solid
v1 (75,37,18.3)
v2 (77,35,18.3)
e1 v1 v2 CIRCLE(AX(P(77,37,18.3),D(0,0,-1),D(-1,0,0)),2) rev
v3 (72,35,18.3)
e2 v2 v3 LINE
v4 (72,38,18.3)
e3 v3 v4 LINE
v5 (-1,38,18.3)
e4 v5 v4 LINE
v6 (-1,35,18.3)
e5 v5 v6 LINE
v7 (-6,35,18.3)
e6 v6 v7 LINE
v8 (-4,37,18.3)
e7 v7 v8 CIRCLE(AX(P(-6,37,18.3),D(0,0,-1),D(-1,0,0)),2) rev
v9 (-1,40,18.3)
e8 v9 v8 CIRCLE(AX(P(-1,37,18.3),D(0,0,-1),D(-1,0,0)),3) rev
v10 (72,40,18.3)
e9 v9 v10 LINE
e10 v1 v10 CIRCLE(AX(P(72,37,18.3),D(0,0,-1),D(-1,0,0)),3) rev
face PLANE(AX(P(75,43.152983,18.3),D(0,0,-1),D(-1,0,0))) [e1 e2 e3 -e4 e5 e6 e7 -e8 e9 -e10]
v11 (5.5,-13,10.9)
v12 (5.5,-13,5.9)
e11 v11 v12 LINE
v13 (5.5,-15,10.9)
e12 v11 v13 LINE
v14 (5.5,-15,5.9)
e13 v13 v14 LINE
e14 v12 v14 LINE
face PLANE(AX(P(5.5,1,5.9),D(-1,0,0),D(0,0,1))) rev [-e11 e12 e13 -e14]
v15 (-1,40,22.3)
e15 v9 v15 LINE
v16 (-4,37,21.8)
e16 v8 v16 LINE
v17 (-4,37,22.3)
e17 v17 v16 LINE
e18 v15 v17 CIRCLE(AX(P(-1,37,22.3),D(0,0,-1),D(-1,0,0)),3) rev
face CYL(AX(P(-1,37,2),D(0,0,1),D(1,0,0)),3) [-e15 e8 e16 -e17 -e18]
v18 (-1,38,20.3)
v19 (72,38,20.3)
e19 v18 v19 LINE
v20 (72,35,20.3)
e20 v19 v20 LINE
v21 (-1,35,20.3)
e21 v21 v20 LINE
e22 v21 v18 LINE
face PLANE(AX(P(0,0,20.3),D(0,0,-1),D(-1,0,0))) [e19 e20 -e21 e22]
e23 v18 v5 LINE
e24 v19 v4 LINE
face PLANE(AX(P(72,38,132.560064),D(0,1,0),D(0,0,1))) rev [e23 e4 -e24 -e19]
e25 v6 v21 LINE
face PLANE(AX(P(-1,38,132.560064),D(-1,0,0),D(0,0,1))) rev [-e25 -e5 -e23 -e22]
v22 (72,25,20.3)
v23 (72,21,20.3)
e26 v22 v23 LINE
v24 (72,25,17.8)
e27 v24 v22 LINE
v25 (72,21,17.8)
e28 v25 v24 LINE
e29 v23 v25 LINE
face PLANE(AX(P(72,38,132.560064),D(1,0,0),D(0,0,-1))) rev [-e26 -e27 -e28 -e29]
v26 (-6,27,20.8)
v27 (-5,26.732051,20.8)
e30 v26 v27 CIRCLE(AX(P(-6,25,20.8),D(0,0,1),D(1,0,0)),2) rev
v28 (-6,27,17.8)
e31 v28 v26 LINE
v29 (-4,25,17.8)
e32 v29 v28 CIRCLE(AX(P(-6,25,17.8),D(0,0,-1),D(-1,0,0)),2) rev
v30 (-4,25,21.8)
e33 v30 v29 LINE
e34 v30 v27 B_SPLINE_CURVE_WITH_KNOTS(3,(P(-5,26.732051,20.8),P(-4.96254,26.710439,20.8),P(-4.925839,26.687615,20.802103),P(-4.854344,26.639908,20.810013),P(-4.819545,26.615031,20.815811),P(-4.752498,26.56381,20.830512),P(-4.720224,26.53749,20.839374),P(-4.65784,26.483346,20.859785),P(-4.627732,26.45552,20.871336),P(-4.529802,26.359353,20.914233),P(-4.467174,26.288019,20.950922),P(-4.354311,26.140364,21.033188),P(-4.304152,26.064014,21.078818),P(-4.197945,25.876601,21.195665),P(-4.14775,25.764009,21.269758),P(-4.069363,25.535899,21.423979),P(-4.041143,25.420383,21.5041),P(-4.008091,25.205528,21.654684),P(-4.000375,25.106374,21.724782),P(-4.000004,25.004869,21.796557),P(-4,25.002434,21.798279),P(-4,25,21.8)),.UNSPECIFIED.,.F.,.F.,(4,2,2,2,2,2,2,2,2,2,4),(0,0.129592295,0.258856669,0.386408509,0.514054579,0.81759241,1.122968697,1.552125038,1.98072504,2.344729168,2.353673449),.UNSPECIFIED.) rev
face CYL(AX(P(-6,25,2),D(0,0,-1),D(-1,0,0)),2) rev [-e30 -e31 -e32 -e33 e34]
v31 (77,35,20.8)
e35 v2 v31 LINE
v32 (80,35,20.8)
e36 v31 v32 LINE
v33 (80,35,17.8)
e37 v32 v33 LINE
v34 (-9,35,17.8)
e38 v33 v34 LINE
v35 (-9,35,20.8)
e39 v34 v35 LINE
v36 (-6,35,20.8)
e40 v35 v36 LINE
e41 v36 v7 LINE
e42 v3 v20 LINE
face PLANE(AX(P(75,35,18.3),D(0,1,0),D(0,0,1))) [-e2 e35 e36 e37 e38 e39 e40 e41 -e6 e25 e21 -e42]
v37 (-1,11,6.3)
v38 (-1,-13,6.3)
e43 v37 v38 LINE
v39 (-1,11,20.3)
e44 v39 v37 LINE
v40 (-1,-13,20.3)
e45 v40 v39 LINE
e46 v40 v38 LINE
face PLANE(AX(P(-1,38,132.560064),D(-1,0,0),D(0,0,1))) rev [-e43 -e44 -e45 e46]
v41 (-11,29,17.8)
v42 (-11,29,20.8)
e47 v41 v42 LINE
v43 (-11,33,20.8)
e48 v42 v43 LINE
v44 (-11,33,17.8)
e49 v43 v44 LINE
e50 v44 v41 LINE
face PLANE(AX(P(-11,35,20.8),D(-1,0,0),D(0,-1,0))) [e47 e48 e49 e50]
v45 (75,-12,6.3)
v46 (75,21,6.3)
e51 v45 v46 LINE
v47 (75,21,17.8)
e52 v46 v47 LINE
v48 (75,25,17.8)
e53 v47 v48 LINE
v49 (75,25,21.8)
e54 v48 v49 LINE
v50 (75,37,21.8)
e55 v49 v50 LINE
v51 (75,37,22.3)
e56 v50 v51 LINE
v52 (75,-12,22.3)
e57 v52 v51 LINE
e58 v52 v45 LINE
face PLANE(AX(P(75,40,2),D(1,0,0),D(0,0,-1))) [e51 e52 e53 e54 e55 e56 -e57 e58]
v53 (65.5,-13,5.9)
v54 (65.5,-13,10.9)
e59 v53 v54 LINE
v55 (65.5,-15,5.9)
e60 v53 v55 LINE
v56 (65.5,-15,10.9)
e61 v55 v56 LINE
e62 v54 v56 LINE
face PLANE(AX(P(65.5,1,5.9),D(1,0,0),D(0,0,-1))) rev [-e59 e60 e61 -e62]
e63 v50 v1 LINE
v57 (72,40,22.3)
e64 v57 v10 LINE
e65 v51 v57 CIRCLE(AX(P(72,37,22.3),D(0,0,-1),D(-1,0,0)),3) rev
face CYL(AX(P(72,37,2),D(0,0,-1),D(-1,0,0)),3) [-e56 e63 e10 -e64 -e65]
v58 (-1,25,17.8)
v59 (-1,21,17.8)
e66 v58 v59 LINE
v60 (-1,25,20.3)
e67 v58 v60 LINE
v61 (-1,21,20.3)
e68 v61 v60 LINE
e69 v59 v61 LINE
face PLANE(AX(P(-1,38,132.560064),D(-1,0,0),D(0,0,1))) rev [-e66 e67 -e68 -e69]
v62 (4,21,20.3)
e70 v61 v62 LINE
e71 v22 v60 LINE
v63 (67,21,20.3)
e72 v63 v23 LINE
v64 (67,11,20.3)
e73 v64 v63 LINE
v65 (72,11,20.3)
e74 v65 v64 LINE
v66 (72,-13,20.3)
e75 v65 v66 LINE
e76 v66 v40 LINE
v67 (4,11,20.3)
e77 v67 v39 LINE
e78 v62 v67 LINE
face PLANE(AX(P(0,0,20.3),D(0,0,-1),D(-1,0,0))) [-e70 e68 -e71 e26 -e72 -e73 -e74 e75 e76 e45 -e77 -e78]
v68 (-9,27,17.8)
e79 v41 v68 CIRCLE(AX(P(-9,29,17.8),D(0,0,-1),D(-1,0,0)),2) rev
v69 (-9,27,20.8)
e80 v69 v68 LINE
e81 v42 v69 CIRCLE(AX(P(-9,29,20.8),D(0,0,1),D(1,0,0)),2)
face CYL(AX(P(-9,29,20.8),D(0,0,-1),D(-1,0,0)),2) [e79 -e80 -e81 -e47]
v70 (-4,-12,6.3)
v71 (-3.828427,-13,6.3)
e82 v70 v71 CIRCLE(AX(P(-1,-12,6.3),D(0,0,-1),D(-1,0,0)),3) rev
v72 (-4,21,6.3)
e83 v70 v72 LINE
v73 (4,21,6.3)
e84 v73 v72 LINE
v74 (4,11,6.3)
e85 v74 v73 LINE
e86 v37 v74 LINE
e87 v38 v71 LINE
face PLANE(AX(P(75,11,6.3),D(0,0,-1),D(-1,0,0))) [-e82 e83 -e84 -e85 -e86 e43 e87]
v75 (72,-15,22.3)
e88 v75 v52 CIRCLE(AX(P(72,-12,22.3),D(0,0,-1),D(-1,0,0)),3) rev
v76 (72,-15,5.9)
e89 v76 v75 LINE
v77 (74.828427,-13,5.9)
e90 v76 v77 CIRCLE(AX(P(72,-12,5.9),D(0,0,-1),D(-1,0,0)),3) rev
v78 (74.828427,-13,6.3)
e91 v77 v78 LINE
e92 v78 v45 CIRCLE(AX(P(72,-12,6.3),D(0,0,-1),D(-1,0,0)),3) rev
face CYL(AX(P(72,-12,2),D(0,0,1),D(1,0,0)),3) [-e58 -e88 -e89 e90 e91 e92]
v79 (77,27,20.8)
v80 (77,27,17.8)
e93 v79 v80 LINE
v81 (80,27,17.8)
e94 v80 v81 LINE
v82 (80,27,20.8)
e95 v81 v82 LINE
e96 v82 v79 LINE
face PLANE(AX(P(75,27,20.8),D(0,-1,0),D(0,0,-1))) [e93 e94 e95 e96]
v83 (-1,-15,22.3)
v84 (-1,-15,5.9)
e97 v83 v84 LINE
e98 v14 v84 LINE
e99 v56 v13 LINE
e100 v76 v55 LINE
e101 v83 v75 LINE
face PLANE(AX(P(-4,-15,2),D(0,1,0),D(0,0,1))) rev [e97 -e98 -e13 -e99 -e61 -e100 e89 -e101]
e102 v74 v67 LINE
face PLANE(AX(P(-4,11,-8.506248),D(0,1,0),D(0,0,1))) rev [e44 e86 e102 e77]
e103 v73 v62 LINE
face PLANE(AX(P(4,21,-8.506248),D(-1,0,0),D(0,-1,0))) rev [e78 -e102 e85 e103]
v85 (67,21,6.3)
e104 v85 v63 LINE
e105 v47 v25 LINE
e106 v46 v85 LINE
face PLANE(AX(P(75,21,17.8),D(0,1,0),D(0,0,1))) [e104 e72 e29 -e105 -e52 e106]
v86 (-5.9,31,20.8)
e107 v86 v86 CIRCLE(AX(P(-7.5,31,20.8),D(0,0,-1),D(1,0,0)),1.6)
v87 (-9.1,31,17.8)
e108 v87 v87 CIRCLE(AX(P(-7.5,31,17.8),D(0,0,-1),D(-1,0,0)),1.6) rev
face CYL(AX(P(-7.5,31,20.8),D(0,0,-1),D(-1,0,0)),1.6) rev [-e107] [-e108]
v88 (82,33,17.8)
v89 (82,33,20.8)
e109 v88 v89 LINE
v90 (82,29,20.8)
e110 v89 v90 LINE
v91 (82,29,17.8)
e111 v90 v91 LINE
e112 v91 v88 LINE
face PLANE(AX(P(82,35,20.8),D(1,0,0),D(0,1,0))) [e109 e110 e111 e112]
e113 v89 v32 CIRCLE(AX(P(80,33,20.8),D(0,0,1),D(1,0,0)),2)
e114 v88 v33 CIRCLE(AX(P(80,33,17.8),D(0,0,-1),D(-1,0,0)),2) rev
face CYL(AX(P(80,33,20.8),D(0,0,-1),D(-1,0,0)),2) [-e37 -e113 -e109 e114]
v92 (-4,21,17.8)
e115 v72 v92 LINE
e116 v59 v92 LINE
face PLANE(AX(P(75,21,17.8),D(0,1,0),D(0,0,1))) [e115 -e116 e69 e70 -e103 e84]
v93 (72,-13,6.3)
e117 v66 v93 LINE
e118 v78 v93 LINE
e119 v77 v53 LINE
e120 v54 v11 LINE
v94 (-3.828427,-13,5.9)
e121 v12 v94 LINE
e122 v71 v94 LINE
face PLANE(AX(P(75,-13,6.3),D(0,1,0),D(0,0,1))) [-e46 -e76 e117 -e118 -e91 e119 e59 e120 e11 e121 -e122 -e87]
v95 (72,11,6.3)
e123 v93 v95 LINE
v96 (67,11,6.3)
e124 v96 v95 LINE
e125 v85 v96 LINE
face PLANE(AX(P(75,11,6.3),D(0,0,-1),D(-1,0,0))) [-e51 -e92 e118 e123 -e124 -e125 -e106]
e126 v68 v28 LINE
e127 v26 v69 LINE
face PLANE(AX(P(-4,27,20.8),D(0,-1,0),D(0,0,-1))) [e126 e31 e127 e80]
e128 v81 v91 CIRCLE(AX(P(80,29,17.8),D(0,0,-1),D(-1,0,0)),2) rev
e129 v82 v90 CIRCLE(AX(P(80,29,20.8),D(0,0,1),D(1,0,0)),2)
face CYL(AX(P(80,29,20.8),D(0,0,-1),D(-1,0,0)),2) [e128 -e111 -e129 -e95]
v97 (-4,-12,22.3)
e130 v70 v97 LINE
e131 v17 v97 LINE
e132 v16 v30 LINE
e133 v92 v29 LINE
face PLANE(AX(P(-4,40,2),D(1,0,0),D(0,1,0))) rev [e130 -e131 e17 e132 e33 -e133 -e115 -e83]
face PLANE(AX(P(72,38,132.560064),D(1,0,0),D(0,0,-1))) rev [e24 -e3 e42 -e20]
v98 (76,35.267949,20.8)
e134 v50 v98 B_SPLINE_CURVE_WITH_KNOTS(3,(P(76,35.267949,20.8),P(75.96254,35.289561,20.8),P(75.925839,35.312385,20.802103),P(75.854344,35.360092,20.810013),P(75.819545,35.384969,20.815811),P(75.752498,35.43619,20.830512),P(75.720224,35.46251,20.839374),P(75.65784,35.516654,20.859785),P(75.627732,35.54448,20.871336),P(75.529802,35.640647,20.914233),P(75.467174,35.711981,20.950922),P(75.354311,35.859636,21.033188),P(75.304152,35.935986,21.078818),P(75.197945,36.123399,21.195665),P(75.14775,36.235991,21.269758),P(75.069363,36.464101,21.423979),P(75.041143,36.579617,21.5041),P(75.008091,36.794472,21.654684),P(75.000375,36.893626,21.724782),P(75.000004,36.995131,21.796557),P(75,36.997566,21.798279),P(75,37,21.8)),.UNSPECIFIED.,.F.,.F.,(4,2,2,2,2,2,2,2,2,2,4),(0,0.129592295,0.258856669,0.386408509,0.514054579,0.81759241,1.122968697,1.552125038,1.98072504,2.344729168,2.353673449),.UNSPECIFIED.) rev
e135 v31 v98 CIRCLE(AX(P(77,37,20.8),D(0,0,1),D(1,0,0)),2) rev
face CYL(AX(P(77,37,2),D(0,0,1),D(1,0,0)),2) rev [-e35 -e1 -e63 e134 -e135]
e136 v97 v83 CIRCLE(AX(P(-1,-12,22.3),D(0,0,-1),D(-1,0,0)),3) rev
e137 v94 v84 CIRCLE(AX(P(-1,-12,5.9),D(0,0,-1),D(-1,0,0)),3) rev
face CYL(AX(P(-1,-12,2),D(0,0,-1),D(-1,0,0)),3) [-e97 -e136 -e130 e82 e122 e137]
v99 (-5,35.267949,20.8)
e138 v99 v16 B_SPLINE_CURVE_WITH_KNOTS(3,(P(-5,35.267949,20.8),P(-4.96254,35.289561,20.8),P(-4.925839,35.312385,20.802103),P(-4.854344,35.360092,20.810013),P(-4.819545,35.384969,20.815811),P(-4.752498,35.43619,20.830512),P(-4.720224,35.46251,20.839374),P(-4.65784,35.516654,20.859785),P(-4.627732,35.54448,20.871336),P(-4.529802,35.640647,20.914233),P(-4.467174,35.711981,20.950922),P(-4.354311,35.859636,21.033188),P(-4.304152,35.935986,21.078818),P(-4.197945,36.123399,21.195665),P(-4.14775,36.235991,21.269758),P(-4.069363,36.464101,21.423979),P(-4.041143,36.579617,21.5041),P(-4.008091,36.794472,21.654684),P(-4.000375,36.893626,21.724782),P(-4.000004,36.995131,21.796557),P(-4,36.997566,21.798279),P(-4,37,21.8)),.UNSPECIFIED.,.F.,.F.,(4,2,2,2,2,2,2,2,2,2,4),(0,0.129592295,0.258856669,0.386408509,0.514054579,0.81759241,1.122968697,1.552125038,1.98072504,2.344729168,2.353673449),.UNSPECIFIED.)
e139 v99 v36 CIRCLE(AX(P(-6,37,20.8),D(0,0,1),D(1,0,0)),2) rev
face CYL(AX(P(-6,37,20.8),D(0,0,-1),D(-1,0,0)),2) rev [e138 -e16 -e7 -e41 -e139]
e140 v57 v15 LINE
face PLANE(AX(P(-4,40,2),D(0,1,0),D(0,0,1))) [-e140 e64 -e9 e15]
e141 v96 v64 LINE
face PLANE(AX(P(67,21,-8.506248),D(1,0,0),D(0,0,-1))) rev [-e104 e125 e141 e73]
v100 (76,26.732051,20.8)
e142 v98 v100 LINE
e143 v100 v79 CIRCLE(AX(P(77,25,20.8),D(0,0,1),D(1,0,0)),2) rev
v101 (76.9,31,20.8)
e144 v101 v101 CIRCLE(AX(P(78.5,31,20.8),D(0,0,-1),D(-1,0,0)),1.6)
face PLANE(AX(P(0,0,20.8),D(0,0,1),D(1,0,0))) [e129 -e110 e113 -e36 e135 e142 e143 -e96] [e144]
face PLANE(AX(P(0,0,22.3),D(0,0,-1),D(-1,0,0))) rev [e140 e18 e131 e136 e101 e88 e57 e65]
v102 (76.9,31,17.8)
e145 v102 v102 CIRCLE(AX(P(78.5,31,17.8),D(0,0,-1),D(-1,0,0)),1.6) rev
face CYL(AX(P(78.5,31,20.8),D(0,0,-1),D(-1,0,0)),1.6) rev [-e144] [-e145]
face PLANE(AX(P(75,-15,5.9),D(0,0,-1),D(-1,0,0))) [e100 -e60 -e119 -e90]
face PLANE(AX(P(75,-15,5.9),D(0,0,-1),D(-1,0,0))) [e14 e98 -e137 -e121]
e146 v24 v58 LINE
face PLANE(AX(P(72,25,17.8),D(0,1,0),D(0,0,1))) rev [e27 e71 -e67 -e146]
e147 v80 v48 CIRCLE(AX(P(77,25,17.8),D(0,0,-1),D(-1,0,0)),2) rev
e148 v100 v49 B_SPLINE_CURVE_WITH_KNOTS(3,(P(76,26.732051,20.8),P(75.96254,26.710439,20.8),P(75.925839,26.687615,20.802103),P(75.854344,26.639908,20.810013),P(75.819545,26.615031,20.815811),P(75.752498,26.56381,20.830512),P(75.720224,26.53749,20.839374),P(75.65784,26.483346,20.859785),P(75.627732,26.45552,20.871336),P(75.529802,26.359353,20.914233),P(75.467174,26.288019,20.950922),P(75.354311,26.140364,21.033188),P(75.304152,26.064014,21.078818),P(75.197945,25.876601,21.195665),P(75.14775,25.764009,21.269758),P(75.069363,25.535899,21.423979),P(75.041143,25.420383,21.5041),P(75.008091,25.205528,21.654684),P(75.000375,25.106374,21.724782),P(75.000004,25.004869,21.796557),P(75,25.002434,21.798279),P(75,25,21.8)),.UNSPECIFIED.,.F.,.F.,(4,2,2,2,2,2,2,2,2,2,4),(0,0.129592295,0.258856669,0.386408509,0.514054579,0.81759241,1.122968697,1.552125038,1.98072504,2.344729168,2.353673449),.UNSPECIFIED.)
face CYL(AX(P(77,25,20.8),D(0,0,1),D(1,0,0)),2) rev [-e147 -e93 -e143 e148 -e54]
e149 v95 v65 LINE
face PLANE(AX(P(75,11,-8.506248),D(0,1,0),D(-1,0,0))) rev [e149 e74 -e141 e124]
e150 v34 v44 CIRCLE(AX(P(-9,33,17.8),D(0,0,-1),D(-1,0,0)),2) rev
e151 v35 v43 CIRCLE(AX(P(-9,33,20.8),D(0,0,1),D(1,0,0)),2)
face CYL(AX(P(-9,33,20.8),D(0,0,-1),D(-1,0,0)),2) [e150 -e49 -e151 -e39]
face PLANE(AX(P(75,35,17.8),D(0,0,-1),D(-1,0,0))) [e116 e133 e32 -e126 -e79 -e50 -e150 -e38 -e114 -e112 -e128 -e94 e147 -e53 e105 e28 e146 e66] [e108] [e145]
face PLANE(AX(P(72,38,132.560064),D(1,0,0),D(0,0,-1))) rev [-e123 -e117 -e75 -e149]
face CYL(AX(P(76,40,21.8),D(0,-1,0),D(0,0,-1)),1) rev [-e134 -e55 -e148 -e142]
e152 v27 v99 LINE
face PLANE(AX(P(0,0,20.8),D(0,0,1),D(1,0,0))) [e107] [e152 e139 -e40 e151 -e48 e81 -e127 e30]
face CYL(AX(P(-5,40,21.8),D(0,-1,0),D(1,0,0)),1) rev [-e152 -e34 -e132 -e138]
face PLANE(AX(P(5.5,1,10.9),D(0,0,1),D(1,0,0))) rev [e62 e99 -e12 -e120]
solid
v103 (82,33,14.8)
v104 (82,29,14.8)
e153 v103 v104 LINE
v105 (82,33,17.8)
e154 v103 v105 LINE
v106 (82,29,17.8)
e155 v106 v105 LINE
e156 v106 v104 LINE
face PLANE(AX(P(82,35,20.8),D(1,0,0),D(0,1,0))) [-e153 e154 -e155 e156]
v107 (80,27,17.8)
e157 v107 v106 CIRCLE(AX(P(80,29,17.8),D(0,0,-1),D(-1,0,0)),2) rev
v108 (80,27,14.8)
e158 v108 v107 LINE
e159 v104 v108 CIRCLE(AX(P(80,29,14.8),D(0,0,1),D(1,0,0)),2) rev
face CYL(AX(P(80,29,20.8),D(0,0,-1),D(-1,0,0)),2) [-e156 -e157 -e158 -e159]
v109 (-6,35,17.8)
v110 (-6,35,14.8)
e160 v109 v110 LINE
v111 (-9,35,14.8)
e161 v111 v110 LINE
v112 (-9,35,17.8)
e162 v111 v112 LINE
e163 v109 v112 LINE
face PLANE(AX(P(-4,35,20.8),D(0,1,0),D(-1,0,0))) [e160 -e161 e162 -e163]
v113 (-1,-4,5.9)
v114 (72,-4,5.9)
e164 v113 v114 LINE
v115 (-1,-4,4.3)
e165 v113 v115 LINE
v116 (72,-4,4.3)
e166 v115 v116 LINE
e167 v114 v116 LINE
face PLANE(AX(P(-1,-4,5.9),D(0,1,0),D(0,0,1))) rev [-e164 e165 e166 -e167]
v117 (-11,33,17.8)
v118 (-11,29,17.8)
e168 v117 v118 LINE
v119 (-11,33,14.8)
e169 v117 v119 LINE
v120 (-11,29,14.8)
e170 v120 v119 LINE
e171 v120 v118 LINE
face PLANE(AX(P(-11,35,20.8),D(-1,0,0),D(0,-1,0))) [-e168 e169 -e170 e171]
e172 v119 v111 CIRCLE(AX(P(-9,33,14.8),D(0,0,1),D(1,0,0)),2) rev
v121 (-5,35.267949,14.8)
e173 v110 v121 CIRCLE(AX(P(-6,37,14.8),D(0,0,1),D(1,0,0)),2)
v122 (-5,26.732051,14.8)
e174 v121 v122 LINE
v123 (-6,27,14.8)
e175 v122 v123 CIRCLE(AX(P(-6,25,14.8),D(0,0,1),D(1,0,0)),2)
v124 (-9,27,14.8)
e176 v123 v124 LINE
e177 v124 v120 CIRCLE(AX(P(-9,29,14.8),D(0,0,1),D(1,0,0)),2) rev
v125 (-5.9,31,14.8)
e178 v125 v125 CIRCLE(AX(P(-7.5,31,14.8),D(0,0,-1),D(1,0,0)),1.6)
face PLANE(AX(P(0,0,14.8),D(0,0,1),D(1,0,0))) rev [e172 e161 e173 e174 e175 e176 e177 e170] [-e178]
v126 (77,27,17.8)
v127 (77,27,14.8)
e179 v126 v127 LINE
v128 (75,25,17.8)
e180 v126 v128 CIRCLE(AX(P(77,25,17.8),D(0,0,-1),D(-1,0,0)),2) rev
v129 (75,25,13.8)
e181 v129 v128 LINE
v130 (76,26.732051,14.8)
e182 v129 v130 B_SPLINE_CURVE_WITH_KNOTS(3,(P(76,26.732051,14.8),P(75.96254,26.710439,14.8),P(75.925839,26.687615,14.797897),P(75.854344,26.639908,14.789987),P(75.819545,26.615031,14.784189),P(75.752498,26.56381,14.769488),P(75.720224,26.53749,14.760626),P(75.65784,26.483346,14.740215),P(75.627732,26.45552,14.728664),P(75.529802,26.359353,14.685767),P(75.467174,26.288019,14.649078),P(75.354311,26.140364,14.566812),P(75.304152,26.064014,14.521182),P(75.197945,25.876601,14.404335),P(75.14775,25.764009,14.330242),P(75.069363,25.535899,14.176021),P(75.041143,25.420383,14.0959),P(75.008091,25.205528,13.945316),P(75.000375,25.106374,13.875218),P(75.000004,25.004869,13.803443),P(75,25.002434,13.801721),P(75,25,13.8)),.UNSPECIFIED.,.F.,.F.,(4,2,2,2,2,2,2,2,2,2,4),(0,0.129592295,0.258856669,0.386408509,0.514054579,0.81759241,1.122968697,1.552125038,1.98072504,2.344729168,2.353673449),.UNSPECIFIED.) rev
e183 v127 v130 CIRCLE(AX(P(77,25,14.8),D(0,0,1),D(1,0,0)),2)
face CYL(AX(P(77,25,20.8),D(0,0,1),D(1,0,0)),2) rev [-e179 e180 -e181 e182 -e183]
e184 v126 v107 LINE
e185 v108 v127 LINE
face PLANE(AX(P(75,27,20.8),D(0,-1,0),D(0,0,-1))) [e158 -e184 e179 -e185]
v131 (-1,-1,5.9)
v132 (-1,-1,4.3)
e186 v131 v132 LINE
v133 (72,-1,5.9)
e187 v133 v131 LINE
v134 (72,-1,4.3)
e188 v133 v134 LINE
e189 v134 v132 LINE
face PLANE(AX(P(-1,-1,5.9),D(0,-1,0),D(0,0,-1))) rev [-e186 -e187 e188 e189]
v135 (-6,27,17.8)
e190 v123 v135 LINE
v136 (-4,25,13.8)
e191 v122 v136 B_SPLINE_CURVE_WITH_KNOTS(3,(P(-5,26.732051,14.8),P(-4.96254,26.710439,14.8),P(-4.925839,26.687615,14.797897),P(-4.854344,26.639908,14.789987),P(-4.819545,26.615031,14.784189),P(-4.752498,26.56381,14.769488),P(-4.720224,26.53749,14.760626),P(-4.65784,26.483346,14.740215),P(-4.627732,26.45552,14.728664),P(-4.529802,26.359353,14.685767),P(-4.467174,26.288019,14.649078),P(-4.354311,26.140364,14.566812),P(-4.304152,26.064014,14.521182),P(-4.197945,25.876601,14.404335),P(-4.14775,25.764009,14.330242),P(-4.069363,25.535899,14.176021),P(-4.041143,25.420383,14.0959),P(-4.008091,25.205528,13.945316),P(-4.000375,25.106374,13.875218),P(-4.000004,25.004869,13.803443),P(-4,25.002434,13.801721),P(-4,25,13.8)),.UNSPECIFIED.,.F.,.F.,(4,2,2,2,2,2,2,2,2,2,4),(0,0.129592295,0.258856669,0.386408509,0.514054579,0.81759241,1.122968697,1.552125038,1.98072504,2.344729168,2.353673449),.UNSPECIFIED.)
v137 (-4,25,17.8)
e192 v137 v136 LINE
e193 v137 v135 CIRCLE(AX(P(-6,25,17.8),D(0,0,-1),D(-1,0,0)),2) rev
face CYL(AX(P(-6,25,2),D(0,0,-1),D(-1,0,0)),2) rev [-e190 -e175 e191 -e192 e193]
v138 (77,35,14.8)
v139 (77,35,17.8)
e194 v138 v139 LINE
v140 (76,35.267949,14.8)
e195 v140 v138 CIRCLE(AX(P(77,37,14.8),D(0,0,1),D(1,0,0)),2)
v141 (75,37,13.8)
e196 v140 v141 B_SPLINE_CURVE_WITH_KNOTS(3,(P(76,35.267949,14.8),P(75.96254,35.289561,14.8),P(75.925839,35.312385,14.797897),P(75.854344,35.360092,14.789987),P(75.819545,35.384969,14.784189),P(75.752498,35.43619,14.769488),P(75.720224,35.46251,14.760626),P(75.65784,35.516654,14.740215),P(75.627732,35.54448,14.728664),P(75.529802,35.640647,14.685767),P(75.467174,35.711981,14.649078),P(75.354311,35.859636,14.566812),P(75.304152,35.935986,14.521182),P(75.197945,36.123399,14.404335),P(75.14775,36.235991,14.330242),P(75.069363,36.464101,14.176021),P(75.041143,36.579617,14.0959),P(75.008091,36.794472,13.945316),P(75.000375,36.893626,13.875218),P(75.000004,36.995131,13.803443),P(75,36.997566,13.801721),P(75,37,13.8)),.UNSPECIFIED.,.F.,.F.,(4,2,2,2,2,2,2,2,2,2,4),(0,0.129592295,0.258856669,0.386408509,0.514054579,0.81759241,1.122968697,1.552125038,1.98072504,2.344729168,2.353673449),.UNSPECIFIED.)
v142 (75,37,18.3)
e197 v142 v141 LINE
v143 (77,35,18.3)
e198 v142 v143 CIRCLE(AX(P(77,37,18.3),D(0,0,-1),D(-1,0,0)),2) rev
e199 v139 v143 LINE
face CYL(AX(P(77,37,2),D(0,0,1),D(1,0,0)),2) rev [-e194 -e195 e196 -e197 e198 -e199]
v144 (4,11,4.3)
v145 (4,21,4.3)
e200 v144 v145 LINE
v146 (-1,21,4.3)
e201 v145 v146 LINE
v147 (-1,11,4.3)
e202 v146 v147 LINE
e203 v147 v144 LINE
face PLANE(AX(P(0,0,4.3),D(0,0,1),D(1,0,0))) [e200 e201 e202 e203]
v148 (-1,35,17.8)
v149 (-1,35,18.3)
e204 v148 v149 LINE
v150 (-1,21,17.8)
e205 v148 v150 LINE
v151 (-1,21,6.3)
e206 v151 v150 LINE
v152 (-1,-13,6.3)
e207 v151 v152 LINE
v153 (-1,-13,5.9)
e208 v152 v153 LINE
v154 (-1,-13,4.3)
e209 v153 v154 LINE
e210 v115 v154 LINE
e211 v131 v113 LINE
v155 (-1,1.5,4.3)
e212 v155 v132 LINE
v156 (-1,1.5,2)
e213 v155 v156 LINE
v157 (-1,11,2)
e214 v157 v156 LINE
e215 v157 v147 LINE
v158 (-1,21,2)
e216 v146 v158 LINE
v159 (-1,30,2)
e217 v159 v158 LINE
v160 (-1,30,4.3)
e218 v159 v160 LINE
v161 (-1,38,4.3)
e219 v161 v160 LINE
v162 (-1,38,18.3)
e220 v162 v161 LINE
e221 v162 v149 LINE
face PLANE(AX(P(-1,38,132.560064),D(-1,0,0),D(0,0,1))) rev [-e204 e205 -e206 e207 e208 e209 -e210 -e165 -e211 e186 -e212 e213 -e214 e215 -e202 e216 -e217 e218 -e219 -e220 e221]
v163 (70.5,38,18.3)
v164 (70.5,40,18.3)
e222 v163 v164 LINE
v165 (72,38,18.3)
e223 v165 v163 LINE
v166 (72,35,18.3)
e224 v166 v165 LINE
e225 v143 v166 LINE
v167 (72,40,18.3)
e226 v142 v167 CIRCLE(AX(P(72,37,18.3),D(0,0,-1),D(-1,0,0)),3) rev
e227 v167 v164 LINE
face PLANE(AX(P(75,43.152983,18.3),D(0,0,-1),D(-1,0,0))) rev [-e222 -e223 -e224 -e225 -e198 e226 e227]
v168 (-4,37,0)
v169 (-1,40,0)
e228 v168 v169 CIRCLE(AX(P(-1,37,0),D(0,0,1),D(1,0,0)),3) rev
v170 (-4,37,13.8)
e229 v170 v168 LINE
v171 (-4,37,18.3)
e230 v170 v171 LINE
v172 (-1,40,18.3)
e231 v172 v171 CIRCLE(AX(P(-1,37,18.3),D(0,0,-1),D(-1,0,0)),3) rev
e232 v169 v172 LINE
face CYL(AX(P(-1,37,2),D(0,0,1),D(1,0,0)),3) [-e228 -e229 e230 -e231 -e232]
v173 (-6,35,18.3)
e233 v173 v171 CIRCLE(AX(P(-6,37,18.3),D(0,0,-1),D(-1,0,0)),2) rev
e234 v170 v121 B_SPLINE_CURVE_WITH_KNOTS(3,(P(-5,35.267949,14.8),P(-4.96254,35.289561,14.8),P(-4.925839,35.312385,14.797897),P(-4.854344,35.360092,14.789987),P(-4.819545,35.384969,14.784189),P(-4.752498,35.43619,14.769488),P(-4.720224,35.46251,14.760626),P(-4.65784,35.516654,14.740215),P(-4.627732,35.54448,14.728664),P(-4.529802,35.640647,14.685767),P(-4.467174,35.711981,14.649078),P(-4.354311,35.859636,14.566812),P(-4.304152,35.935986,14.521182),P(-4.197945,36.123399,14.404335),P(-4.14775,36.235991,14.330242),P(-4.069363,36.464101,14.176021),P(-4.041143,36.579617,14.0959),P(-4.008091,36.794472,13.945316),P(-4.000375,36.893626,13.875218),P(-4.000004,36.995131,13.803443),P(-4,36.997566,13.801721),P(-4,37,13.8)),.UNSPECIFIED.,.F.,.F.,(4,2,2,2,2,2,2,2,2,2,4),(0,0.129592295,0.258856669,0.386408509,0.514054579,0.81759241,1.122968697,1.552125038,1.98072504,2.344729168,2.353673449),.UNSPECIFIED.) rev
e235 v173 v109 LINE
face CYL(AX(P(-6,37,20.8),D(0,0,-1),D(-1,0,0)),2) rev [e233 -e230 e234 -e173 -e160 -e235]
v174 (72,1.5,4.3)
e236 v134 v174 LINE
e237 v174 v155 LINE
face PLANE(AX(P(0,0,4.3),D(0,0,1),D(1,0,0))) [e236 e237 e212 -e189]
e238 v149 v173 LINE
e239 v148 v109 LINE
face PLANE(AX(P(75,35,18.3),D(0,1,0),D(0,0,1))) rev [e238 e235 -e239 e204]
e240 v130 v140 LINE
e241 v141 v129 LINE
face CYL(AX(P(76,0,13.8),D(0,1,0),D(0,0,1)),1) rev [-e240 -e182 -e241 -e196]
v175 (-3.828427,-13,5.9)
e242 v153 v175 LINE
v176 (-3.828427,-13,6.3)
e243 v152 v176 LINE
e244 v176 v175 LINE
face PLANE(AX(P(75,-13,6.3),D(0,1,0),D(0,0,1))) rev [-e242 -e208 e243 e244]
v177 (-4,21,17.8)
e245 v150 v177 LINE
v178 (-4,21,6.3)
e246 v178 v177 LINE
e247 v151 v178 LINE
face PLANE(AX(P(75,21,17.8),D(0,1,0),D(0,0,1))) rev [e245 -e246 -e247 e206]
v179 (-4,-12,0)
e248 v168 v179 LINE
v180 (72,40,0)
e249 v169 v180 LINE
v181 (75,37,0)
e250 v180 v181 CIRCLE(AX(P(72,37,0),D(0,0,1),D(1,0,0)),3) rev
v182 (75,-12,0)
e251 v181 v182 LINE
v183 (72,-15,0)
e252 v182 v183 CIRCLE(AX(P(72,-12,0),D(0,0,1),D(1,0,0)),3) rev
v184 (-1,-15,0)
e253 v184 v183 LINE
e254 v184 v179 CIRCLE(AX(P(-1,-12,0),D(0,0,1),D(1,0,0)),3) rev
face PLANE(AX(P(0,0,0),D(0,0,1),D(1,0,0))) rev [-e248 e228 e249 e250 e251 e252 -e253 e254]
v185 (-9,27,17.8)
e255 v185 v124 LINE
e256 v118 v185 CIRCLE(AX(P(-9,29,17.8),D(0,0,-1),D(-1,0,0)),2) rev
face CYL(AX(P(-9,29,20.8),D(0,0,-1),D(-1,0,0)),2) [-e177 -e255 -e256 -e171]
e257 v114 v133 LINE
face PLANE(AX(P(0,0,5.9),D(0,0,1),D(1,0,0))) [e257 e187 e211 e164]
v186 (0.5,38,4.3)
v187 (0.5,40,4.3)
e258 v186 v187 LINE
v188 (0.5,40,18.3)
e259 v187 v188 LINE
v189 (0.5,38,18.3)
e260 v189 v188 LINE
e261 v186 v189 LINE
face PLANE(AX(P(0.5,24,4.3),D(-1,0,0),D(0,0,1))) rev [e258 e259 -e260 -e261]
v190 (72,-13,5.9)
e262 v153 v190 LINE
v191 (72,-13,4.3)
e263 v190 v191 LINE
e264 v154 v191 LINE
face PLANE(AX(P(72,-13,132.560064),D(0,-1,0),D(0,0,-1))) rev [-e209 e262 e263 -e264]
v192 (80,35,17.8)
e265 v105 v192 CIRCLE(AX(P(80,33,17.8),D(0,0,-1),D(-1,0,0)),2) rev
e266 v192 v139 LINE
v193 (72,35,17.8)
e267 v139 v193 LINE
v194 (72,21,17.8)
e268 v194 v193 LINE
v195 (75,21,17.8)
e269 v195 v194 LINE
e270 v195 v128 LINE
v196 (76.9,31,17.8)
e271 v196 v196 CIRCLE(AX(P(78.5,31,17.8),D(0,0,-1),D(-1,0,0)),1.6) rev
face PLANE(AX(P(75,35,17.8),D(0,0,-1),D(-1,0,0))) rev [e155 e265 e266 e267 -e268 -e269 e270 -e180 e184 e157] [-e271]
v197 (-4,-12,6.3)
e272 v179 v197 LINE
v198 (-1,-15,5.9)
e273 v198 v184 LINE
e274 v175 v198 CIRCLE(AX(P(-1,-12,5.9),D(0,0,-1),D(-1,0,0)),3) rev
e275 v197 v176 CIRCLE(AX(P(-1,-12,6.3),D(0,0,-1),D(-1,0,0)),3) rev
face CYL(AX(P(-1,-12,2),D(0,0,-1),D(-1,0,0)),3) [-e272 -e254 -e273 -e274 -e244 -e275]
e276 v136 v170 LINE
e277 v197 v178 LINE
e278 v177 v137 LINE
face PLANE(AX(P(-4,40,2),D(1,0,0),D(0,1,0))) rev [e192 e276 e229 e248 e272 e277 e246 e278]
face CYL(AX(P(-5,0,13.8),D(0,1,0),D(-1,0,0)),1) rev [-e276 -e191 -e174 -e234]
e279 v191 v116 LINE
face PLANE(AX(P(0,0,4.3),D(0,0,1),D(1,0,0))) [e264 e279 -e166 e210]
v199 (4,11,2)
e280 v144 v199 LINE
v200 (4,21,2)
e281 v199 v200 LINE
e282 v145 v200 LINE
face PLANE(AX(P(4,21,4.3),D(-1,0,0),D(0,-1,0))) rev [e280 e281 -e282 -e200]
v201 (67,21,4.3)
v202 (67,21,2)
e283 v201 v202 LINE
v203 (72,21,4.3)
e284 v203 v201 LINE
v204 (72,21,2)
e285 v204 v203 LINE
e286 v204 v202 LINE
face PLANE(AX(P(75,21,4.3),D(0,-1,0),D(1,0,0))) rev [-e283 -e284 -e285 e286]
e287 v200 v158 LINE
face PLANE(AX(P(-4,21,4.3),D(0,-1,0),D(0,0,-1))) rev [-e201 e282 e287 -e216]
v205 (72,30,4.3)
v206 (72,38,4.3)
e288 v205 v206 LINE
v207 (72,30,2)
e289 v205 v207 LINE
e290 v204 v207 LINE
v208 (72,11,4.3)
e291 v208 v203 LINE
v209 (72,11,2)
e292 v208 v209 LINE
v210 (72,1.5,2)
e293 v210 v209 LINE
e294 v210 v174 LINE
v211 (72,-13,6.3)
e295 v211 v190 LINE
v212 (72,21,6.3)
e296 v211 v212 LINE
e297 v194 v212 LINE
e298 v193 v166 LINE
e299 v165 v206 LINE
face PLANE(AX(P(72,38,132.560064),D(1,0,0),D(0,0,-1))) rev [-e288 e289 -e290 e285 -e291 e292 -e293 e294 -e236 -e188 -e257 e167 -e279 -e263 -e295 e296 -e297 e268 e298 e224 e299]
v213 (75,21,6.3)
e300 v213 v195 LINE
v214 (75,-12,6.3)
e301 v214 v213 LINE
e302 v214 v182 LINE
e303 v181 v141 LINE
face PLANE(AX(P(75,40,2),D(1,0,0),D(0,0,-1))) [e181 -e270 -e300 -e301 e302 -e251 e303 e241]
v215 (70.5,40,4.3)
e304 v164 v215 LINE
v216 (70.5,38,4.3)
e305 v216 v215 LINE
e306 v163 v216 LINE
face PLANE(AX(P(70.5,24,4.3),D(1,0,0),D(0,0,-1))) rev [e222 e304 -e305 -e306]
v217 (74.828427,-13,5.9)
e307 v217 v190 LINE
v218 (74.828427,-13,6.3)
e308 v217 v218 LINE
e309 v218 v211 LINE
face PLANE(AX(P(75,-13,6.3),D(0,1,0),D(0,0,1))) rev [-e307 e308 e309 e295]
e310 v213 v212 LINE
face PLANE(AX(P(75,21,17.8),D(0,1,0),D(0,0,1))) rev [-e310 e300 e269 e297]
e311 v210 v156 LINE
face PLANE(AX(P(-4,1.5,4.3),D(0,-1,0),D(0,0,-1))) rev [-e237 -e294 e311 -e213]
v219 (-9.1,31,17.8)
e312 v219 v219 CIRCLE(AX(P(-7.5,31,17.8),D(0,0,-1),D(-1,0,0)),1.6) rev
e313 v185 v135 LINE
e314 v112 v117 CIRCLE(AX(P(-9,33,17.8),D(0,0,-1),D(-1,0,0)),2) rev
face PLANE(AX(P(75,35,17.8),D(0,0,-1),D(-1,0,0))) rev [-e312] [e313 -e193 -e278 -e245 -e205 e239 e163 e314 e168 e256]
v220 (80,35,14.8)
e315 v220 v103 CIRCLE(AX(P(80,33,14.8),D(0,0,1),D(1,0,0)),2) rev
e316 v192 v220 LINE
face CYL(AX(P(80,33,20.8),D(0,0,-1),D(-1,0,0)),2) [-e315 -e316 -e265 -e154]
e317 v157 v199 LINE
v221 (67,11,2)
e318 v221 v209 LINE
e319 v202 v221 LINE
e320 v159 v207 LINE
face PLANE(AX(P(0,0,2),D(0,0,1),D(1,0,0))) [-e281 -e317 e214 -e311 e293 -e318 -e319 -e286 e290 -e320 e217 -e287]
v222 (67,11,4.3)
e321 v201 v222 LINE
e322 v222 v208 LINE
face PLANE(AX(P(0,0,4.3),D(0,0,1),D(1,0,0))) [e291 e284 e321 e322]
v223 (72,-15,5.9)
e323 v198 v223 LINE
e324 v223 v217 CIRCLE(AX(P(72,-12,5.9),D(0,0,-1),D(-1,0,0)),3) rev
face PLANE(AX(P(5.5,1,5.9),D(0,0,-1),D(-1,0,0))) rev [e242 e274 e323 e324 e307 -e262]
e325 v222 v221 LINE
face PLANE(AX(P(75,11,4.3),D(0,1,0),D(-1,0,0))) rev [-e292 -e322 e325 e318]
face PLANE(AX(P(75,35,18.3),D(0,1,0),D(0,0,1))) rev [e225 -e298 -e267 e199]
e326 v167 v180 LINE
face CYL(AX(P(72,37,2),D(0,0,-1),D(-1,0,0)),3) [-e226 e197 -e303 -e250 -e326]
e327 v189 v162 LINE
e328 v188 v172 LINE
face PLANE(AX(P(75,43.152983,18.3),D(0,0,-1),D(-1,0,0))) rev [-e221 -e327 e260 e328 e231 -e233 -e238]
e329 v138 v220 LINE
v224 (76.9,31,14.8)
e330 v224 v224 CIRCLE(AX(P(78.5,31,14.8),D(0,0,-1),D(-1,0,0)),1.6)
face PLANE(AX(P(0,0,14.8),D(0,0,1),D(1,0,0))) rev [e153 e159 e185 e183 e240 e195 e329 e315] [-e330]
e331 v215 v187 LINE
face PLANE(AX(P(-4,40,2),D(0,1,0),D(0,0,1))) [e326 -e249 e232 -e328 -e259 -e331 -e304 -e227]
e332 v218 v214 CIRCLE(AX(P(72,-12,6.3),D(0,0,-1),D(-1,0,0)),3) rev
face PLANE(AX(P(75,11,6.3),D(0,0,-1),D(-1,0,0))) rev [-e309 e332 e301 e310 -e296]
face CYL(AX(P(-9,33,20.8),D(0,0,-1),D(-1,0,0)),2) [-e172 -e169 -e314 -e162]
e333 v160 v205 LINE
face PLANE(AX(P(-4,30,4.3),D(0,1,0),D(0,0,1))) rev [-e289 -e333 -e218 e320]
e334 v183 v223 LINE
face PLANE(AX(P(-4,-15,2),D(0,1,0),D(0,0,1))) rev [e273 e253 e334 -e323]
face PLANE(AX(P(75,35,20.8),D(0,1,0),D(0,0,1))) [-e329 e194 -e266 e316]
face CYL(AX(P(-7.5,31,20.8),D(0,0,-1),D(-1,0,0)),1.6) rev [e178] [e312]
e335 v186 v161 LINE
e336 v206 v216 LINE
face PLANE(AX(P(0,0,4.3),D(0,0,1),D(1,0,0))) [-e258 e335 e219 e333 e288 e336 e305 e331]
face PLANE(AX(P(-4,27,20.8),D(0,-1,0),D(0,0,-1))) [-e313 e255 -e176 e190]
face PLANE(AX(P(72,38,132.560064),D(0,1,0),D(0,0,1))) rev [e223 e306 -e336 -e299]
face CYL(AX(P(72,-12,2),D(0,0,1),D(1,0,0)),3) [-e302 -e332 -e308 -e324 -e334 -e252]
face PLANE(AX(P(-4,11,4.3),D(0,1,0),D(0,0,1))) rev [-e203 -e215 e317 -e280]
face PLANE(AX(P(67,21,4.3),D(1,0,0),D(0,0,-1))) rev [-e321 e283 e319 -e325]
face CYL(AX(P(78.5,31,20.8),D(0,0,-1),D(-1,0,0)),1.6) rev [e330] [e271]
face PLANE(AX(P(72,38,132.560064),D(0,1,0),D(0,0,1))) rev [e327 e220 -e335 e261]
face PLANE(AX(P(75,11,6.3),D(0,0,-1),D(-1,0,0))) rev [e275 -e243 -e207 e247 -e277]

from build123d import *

# Parameters (mm, degrees)
SKETCH1_W                = 79
SKETCH1_H                = 55
BOSS_EXTRUDE1_DEPTH      = 2
SKETCH2_W                = 79
SKETCH2_H                = 10
SKETCH2_W_2              = 8
SKETCH2_H_2              = 16.5
BOSS_EXTRUDE2_DEPTH      = 2.3
SKETCH3_W                = 79
SKETCH3_H                = 55
SKETCH3_W_2              = 73
SKETCH3_H_2              = 51
BOSS_EXTRUDE3_DEPTH      = 20.3
SKETCH12_W               = 73
SKETCH12_H               = 3
BOSS_EXTRUDE8_DEPTH      = 1.6
SKETCH4_W                = 70
SKETCH4_H                = 14
CUT_EXTRUDE1_DEPTH       = 16
SKETCH5_W                = 60
SKETCH5_H                = 5
CUT_EXTRUDE2_DEPTH       = 16
SKETCH6_W                = 79
SKETCH6_H                = 55
BOSS_EXTRUDE4_DEPTH      = 2
SKETCH7_W                = 73
SKETCH7_H                = 10
BOSS_EXTRUDE5_DEPTH      = 2.5
SKETCH8_W                = 8
SKETCH8_H                = 10
BOSS_EXTRUDE6_DEPTH      = 14
BOSS_EXTRUDE7_DEPTH      = 3
BOSS_EXTRUDE7_DEPTH_BACK = 3
SKETCH10_W               = 7
SKETCH10_H               = 8
SKETCH10_R               = 1.6
FILLET1_R                = 2
FILLET2_R                = 1
FILLET3_START            = -1
FILLET3_DEPTH            = 24
SURFACE_EXTRUDE1_1_BACK  = 90
SURFACE_EXTRUDE1_1_DEPTH = 100
SURFACE_EXTRUDE1_2_BACK  = 90
SURFACE_EXTRUDE1_2_DEPTH = 100


with BuildPart() as part:
    # Sketch1 → Boss-Extrude1 (new body)
    with BuildSketch(Plane.XY):
        with Locations((35.5, 12.5)):
            Rectangle(SKETCH1_W, SKETCH1_H)
    extrude(amount=BOSS_EXTRUDE1_DEPTH)

    # Sketch2 → Boss-Extrude2 (add)
    with BuildSketch(Plane.XY.offset(2)):
        with Locations((35.5, 35)):
            Rectangle(SKETCH2_W, SKETCH2_H)
        with Locations((0, 16)):
            Rectangle(SKETCH2_W_2, SKETCH2_H)
        with Locations((71, 16)):
            Rectangle(SKETCH2_W_2, SKETCH2_H)
        with Locations((35.5, -6.75)):
            Rectangle(SKETCH2_W, SKETCH2_H_2)
    extrude(amount=BOSS_EXTRUDE2_DEPTH)

    # Sketch3 → Boss-Extrude3 (add)
    with BuildSketch(Plane(origin=(0, 0, 0), x_dir=(-1, 0, 0), z_dir=(0, 0, -1))):
        with Locations((-35.5, 12.5)):
            Rectangle(SKETCH3_W, SKETCH3_H)
        with Locations((-35.5, 12.5)):
            Rectangle(SKETCH3_W_2, SKETCH3_H_2, mode=Mode.SUBTRACT)
    extrude(amount=-BOSS_EXTRUDE3_DEPTH)

    # Sketch12 → Boss-Extrude8 (add)
    with BuildSketch(Plane.XY.offset(4.3)):
        with Locations((35.5, -2.5)):
            Rectangle(SKETCH12_W, SKETCH12_H)
    extrude(amount=BOSS_EXTRUDE8_DEPTH)

    # Sketch4 → Cut-Extrude1 (cut)
    with BuildSketch(Plane(origin=(0, 40, 0), x_dir=(1, 0, 0), z_dir=(0, 1, 0))):
        with Locations((35.5, -11.3)):
            Rectangle(SKETCH4_W, SKETCH4_H)
    extrude(amount=-CUT_EXTRUDE1_DEPTH, mode=Mode.SUBTRACT)

    # Sketch5 → Cut-Extrude2 (cut)
    with BuildSketch(Plane.XZ.offset(15)):
        with Locations((35.5, 8.4)):
            Rectangle(SKETCH5_W, SKETCH5_H)
    extrude(amount=-CUT_EXTRUDE2_DEPTH, mode=Mode.SUBTRACT)

    # Sketch6 → Boss-Extrude4 (add)
    with BuildSketch(Plane.XY.offset(20.3)):
        with Locations((35.5, 12.5)):
            Rectangle(SKETCH6_W, SKETCH6_H)
    extrude(amount=BOSS_EXTRUDE4_DEPTH)

    # Sketch7 → Boss-Extrude5 (add)
    with BuildSketch(Plane(origin=(0, 0, 20.3), x_dir=(-1, 0, 0), z_dir=(0, 0, -1))):
        with Locations((-35.5, 30)):
            Rectangle(SKETCH7_W, SKETCH7_H)
    extrude(amount=BOSS_EXTRUDE5_DEPTH)

    # Sketch8 → Boss-Extrude6 (add)
    with BuildSketch(Plane(origin=(0, 0, 20.3), x_dir=(-1, 0, 0), z_dir=(0, 0, -1))):
        with Locations((-71, 16)):
            Rectangle(SKETCH8_W, SKETCH8_H)
        with Locations((0, 16)):
            Rectangle(SKETCH8_W, SKETCH8_H)
    extrude(amount=BOSS_EXTRUDE6_DEPTH)

    # Sketch10 → Boss-Extrude7 (add, two sides: drawn at the far end of the back side and taken through both)
    # profile 1 of 2: a face of its own
    with BuildSketch(Plane(origin=(0, 0, 17.8), x_dir=(-1, 0, 0), z_dir=(0, 0, -1)).offset(-BOSS_EXTRUDE7_DEPTH_BACK)):
        with Locations((-78.5, 31)):
            Rectangle(SKETCH10_W, SKETCH10_H)
        with Locations((-78.5, 31)):
            Circle(SKETCH10_R, mode=Mode.SUBTRACT)
    # profile 2 of 2: a face of its own
    with BuildSketch(Plane(origin=(0, 0, 17.8), x_dir=(-1, 0, 0), z_dir=(0, 0, -1)).offset(-BOSS_EXTRUDE7_DEPTH_BACK)):
        with Locations((7.5, 31)):
            Rectangle(SKETCH10_W, SKETCH10_H)
        with Locations(Location((7.5, 31, 0), (0, 0, 180))):
            Circle(SKETCH10_R, mode=Mode.SUBTRACT)
    extrude(amount=BOSS_EXTRUDE7_DEPTH + BOSS_EXTRUDE7_DEPTH_BACK)

    # Fillet1
    fillet1_edges = [part.edges().sort_by_distance(p)[0] for p in [
        (75, 35, 17.8),
        (75, 27, 17.8),
        (82, 27, 17.8),
        (82, 35, 17.8),
        (-4, 35, 17.8),
        (-11, 35, 17.8),
        (-11, 27, 17.8),
        (-4, 27, 17.8),
    ]]
    fillet(fillet1_edges, radius=FILLET1_R)

    # Fillet2
    fillet2_edges = [part.edges().sort_by_distance(p)[0] for p in [
        (75, 31, 20.8),
        (75, 31, 14.8),
        (-4, 31, 20.8),
        (-4, 31, 14.8),
    ]]
    fillet(fillet2_edges, radius=FILLET2_R)

    # Fillet3: read off the stored shape, not the designer's step
    # Fillet3 outline → Fillet3 (cut)
    with BuildSketch(Plane.XY.offset(FILLET3_START)):
        with BuildLine():
            Line((75, 40), (72, 40))
            ThreePointArc((72, 40), (74.121320344, 39.121320344), (75, 37))
            Line((75, 37), (75, 40))
        make_face()
        with BuildLine():
            ThreePointArc((-4, 37), (-3.121320344, 39.121320344), (-1, 40))
            Line((-1, 40), (-4, 40))
            Line((-4, 40), (-4, 37))
        make_face()
        with BuildLine():
            Line((75, -15), (75, -12))
            ThreePointArc((75, -12), (74.121320344, -14.121320344), (72, -15))
            Line((72, -15), (75, -15))
        make_face()
        with BuildLine():
            ThreePointArc((-1, -15), (-3.121320344, -14.121320344), (-4, -12))
            Line((-4, -12), (-4, -15))
            Line((-4, -15), (-1, -15))
        make_face()
    extrude(amount=FILLET3_DEPTH, mode=Mode.SUBTRACT)


with BuildPart() as body_2:
    # Split1: the piece behind the surface
    add(part.part)
    # Surface-Extrude1: a surface, the sketch's curves swept straight by 100 mm
    with BuildLine(Plane(origin=(75, 0, 0), x_dir=(0, 0, -1), z_dir=(1, 0, 0)).offset(-SURFACE_EXTRUDE1_1_BACK), mode=Mode.PRIVATE) as surface_extrude1_1_path:
        Line((-18.3, 43.152983042), (-18.3, 35))
        Line((-18.3, 35), (-17.8, 35))
        Line((-17.8, 35), (-17.8, 21))
        Line((-17.8, 21), (-6.3, 21))
        Line((-6.3, 21), (-6.3, 11))
        Line((-6.3, 11), (-6.3, -13))
        Line((-6.3, -13), (-5.9, -13))
        Line((-5.9, -13), (-5.9, -15))
        Line((-5.9, -15), (-5.9, -17.138278701))
    surface_extrude1_1 = Shell.extrude(surface_extrude1_1_path.wire(), (1 * SURFACE_EXTRUDE1_1_DEPTH, 0 * SURFACE_EXTRUDE1_1_DEPTH, 0 * SURFACE_EXTRUDE1_1_DEPTH))
    split(bisect_by=surface_extrude1_1, keep=Keep.BOTTOM)


with BuildPart() as part_1:
    add(part.part)

    # Split1: split by a surface, the side it looks to stays
    # Surface-Extrude1: a surface, the sketch's curves swept straight by 100 mm
    with BuildLine(Plane(origin=(75, 0, 0), x_dir=(0, 0, -1), z_dir=(1, 0, 0)).offset(-SURFACE_EXTRUDE1_2_BACK), mode=Mode.PRIVATE) as surface_extrude1_2_path:
        Line((-18.3, 43.152983042), (-18.3, 35))
        Line((-18.3, 35), (-17.8, 35))
        Line((-17.8, 35), (-17.8, 21))
        Line((-17.8, 21), (-6.3, 21))
        Line((-6.3, 21), (-6.3, 11))
        Line((-6.3, 11), (-6.3, -13))
        Line((-6.3, -13), (-5.9, -13))
        Line((-5.9, -13), (-5.9, -15))
        Line((-5.9, -15), (-5.9, -17.138278701))
    surface_extrude1_2 = Shell.extrude(surface_extrude1_2_path.wire(), (1 * SURFACE_EXTRUDE1_2_DEPTH, 0 * SURFACE_EXTRUDE1_2_DEPTH, 0 * SURFACE_EXTRUDE1_2_DEPTH))
    split(bisect_by=surface_extrude1_2, keep=Keep.TOP)


solid = Compound([body_2.part, part_1.part])
